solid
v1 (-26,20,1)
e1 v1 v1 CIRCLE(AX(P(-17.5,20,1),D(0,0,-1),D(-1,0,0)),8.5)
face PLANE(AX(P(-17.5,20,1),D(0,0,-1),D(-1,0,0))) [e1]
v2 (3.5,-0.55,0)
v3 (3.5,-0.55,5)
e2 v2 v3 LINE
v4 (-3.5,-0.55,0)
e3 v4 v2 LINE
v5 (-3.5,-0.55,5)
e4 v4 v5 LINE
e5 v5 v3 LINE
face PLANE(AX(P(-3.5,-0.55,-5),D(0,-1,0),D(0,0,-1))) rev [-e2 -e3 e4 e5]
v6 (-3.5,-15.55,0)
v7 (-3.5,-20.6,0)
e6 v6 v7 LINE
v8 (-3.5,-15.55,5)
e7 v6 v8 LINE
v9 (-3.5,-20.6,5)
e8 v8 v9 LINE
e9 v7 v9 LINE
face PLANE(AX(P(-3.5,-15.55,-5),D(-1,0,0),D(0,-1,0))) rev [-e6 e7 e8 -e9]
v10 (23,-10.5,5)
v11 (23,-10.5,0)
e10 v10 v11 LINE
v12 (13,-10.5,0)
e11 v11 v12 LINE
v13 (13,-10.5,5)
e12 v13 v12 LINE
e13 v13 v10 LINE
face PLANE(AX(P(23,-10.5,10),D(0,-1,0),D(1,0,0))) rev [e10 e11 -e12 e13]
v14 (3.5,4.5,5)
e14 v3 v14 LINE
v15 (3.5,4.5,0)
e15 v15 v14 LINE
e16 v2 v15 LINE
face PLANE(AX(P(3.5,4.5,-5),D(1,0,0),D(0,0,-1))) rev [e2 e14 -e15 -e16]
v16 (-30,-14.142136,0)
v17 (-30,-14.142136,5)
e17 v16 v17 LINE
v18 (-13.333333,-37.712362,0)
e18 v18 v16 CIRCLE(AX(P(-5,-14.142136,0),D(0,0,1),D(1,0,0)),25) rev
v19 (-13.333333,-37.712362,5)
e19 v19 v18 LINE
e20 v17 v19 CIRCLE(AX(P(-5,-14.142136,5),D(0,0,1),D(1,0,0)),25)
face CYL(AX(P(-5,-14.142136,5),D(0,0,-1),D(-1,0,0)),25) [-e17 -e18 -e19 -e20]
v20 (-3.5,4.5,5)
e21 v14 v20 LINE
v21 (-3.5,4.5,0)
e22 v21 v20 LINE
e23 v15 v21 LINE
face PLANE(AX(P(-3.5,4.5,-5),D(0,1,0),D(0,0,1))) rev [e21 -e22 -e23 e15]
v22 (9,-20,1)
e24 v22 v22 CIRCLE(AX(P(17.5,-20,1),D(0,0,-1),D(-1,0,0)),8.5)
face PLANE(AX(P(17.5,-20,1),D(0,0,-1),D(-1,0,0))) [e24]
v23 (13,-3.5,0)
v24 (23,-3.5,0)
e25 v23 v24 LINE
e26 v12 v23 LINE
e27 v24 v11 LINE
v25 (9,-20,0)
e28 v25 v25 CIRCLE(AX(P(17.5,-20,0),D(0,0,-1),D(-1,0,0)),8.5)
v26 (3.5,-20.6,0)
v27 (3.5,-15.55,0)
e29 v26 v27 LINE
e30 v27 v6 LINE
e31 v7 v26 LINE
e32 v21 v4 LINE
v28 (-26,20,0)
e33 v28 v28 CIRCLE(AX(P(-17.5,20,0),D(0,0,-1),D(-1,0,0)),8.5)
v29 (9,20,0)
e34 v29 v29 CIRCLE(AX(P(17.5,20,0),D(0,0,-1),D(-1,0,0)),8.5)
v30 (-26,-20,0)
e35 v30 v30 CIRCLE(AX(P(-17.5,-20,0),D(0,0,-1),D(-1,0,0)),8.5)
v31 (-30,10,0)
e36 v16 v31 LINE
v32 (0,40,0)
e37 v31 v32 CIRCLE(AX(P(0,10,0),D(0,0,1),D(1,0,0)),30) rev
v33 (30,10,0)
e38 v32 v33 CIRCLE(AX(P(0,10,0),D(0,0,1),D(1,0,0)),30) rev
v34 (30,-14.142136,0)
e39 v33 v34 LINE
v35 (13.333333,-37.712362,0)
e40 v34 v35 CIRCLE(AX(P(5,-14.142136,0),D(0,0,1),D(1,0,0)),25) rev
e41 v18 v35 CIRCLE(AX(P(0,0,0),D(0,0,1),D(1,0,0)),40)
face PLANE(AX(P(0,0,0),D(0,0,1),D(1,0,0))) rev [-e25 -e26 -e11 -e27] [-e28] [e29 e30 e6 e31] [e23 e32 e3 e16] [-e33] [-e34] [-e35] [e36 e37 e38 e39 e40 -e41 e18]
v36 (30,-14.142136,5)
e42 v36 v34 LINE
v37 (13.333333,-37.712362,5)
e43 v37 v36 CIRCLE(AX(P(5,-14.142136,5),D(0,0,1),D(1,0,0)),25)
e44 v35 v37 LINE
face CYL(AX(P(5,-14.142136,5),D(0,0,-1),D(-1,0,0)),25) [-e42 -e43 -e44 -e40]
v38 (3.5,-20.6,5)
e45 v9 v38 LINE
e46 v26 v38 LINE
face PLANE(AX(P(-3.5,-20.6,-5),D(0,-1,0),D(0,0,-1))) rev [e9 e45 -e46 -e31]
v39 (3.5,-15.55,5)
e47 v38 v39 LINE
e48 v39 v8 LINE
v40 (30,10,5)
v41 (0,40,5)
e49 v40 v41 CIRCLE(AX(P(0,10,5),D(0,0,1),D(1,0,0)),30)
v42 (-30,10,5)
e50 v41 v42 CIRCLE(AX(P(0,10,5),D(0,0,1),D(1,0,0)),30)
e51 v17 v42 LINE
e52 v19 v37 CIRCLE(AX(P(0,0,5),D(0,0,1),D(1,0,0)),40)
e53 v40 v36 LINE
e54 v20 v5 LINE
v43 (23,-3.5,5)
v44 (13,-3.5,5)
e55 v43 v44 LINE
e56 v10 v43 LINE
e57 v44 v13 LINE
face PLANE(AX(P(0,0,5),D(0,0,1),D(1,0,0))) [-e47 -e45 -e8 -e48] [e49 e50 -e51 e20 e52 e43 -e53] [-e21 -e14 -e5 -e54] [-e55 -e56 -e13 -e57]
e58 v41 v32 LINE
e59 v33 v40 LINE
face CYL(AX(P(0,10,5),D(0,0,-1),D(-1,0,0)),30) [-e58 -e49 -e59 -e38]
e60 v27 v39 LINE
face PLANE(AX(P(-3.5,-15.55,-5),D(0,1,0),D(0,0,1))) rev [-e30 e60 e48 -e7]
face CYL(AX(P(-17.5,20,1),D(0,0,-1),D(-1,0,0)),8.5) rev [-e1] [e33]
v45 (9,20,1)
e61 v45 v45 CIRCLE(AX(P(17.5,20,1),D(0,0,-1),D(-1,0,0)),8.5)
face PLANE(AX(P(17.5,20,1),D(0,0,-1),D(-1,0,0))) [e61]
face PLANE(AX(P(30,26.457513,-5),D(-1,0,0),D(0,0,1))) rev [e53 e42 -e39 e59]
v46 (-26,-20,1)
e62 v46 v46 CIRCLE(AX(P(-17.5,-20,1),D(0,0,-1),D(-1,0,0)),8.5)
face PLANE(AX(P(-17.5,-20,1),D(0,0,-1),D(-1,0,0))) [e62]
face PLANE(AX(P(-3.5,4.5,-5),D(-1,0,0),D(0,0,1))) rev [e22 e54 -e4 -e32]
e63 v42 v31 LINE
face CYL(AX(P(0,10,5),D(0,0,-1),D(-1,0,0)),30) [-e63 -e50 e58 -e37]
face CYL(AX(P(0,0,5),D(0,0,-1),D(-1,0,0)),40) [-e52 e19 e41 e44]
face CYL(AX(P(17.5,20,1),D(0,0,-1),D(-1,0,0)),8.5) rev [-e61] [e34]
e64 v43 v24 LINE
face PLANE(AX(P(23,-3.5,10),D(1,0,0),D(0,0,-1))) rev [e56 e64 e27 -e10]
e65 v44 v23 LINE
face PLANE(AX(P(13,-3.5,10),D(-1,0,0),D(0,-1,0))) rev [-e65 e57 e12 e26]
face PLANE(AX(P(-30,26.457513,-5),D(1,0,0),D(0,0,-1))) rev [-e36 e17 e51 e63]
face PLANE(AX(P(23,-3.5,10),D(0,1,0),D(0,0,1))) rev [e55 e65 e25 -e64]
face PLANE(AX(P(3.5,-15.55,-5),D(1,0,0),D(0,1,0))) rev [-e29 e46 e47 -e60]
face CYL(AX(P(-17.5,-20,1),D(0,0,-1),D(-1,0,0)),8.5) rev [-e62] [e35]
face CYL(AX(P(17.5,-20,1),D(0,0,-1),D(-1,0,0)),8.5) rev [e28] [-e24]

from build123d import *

# Parameters (mm, degrees)
SKETCH1_R           = 40
BOSS_EXTRUDE1_DEPTH = 5
CUT_EXTRUDE3_START  = -10
CUT_EXTRUDE3_DEPTH  = 10
FILLET1_R           = 30
FILLET2_R           = 25
SKETCH14_W          = 7
SKETCH14_H          = 5.05
CUT_EXTRUDE4_DEPTH  = 10
SKETCH18_W          = 10
SKETCH18_H          = 7
CUT_EXTRUDE6_DEPTH  = 10
SKETCH20_R          = 8.5
CUT_EXTRUDE8_DEPTH  = 1


with BuildPart() as part:
    # Sketch1 → Boss-Extrude1 (new body)
    with BuildSketch(Plane.XY):
        Circle(SKETCH1_R)
    extrude(amount=BOSS_EXTRUDE1_DEPTH)

    # Sketch10 → Cut-Extrude3 (cut)
    with BuildSketch(Plane.XY.offset(5).offset(CUT_EXTRUDE3_START)):
        with BuildLine():
            Line((-30, 26.457513111), (-30, -26.457513111))
            ThreePointArc((-30, -26.457513111), (-40, 0), (-30, 26.457513111))
        make_face()
        with BuildLine():
            Line((30, 26.457513111), (30, -26.457513111))
            ThreePointArc((30, -26.457513111), (40, 0), (30, 26.457513111))
        make_face()
    extrude(amount=CUT_EXTRUDE3_DEPTH, mode=Mode.SUBTRACT)

    # Fillet1
    fillet1_edges = [part.edges().sort_by_distance(p)[0] for p in [
        (-30, 26.457513111, 2.5),
        (30, 26.457513111, 2.5),
    ]]
    fillet(fillet1_edges, radius=FILLET1_R - 0.0001)  # a hair under: the kernel refuses the full size

    # Fillet2
    fillet2_edges = [part.edges().sort_by_distance(p)[0] for p in [
        (-30, -26.457513111, 2.5),
        (30, -26.457513111, 2.5),
    ]]
    fillet(fillet2_edges, radius=FILLET2_R)

    # Sketch14 → Cut-Extrude4 (cut)
    with BuildSketch(Plane.XY.offset(5)):
        with Locations((0, 1.975)):
            Rectangle(SKETCH14_W, SKETCH14_H)
        with Locations((0, -18.075)):
            Rectangle(SKETCH14_W, SKETCH14_H)
    extrude(amount=-CUT_EXTRUDE4_DEPTH, mode=Mode.SUBTRACT)

    # Sketch18 → Cut-Extrude6 (cut)
    with BuildSketch(Plane(origin=(0, 0, 0), x_dir=(-1, 0, 0), z_dir=(0, 0, -1))):
        with Locations((-18, -7)):
            Rectangle(SKETCH18_W, SKETCH18_H)
    extrude(amount=-CUT_EXTRUDE6_DEPTH, mode=Mode.SUBTRACT)

    # Sketch20 → Cut-Extrude8 (cut)
    with BuildSketch(Plane(origin=(0, 0, 0), x_dir=(-1, 0, 0), z_dir=(0, 0, -1))):
        with Locations((-17.5, 20)):
            Circle(SKETCH20_R)
        with Locations((17.5, 20)):
            Circle(SKETCH20_R)
        with Locations((17.5, -20)):
            Circle(SKETCH20_R)
        with Locations((-17.5, -20)):
            Circle(SKETCH20_R)
    extrude(amount=-CUT_EXTRUDE8_DEPTH, mode=Mode.SUBTRACT)


solid = part.part
